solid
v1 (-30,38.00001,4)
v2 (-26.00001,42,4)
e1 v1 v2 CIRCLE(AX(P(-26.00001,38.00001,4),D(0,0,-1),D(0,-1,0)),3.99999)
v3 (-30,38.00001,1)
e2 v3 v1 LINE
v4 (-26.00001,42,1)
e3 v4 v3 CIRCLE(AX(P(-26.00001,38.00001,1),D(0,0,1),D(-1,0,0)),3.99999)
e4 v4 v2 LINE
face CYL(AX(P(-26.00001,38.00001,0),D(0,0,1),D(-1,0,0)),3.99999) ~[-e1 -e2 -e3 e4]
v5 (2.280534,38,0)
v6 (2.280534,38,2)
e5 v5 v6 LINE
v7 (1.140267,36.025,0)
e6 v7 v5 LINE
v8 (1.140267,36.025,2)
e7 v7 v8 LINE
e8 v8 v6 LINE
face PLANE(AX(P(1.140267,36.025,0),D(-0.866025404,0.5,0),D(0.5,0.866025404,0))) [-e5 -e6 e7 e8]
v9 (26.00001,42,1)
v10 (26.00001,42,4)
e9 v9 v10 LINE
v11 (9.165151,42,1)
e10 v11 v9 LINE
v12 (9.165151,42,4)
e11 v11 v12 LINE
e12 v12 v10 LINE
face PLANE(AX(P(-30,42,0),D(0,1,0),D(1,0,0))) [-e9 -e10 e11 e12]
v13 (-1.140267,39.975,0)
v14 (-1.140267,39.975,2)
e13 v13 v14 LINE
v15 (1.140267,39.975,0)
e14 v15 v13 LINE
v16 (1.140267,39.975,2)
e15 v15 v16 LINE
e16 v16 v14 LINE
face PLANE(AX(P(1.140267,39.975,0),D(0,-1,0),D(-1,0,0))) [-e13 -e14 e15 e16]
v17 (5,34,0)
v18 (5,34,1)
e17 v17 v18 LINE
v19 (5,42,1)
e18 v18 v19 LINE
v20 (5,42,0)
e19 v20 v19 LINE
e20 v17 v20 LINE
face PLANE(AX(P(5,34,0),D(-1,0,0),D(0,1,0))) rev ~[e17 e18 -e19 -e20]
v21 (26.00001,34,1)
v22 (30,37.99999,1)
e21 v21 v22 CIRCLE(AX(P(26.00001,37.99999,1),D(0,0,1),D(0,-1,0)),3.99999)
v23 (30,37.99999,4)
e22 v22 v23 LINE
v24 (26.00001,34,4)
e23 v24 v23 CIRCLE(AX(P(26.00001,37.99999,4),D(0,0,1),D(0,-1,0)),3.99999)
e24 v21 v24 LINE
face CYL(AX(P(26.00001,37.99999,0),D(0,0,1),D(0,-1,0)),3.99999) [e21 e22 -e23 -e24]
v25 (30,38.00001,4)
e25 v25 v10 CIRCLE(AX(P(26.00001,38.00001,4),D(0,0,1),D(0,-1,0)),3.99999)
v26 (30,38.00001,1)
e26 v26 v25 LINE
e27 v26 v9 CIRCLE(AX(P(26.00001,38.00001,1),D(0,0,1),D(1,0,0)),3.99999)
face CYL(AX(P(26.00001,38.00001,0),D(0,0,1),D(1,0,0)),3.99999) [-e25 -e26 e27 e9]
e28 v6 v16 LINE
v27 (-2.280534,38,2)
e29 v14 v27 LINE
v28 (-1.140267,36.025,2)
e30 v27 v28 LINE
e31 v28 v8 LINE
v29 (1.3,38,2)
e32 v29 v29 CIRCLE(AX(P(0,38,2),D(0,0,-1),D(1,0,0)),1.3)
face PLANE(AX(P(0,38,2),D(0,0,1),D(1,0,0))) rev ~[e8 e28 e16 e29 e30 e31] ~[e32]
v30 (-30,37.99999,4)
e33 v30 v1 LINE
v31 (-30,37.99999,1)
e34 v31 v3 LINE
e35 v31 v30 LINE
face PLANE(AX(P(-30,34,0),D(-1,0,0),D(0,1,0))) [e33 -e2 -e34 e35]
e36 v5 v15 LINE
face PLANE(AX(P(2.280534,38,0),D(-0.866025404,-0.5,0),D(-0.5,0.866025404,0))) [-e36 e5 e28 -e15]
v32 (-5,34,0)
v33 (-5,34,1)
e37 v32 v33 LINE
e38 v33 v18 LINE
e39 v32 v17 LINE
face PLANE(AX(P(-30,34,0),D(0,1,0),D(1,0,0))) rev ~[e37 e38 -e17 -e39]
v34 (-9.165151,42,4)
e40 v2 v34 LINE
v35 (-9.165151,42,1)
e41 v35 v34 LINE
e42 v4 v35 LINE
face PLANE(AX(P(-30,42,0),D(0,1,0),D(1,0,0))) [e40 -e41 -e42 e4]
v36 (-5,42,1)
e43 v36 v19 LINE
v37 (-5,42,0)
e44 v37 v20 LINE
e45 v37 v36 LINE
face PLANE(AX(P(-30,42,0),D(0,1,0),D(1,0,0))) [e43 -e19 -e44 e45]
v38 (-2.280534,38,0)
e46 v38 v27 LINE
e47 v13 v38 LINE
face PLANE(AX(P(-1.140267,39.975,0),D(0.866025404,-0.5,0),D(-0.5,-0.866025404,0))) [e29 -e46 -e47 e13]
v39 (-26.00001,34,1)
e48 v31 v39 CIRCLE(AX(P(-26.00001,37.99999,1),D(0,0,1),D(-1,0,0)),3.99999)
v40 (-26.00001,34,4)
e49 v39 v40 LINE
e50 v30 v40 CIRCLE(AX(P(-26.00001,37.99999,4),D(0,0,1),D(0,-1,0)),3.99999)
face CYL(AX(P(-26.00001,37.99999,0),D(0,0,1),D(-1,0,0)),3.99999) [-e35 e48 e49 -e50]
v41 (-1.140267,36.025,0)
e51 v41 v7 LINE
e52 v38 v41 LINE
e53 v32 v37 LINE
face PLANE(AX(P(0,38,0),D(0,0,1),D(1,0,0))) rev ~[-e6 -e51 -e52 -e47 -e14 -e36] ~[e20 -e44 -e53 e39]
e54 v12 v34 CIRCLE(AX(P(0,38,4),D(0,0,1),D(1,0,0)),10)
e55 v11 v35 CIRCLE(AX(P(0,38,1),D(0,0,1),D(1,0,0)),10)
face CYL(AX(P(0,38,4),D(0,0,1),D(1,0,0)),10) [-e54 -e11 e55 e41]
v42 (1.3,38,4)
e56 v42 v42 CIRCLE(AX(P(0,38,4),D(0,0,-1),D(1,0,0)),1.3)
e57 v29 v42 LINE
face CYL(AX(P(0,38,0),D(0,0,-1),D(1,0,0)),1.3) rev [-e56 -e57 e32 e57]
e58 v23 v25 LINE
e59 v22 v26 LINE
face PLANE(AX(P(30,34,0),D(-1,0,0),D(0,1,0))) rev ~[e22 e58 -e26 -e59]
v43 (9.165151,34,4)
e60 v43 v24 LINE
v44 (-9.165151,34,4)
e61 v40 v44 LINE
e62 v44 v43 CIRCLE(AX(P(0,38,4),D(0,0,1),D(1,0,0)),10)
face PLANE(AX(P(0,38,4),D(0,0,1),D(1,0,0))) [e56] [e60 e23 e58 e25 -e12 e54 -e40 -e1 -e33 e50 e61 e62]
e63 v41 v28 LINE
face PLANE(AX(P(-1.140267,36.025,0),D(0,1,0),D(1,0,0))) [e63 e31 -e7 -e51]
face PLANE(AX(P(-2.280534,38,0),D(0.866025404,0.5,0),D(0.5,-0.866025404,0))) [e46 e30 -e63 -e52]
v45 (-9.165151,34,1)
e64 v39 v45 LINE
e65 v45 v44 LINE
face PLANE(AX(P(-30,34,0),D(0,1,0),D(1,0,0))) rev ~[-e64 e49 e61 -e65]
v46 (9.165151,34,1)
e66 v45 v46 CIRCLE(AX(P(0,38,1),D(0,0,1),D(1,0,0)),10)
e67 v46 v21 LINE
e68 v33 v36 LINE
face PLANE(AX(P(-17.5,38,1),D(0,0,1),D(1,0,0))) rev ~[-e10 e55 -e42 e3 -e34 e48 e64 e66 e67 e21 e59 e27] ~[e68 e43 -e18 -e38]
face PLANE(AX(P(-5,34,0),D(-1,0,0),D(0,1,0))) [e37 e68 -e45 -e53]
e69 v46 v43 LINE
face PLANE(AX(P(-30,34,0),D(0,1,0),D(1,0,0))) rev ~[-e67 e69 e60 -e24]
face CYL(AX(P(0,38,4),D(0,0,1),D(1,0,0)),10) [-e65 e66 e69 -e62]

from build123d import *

# Parameters (mm, degrees)
F2_W      = 60
F2_H      = 8
F2_R      = 3
F4_DEPTH  = 4
F5_R      = 3.99999
F6_R      = 10
F7_DEPTH  = 3
F3_R      = 1.3
F8_DEPTH  = 4.001
F9_W      = 25
F9_H      = 8
F10_DEPTH = 1
F11_DEPTH = 2


# Not quite as in the source:
# - a fillet or chamfer is up to 0.001 mm smaller than in the source, because OpenCascade refuses the exact size


with BuildPart() as f4:
    # F2 (on face) → F4 (new body)
    with BuildSketch(Plane.XY):
        with Locations((0, 38)):
            Rectangle(F2_W, F2_H)
        with Locations((-26, 38)):
            Circle(F2_R, mode=Mode.SUBTRACT)
        Polygon((1.1402667816, 36.025), (0, 36.025), (-1.1402667816, 36.025), (-2.2805335633, 38), (-1.1402667816, 39.975), (0, 39.975), (1.1402667816, 39.975), (2.2805335633, 38), align=None, mode=Mode.SUBTRACT)
        with Locations((26, 38)):
            Circle(F2_R, mode=Mode.SUBTRACT)
        Polygon((-1.1402667816, 36.025), (0, 36.025), (1.1402667816, 36.025), (2.2805335633, 38), (1.1402667816, 39.975), (0, 39.975), (-1.1402667816, 39.975), (-2.2805335633, 38), align=None)
        with Locations((-26, 38)):
            Circle(F2_R)
        with Locations((26, 38)):
            Circle(F2_R)
    extrude(amount=F4_DEPTH)

    # F5 (radius 4 in the source; OpenCascade refuses exactly that, so slightly less here)
    f5_edges = [f4.edges().sort_by_distance(p)[0] for p in [
        (-30, 42, 2),
        (-30, 34, 2),
        (30, 42, 2),
        (30, 34, 2),
    ]]
    fillet(f5_edges, radius=F5_R)

    # F6 (on face) → F7 (join)
    with BuildSketch(Plane.XY.offset(4)):
        with Locations((0, 38)):
            Circle(F6_R)
    extrude(amount=-F7_DEPTH)

    # F3 (on face) → F8 (cut, through all)
    with BuildSketch(Plane.XY):
        with Locations((0, 38)):
            Circle(F3_R)
    extrude(amount=F8_DEPTH, mode=Mode.SUBTRACT)

    # F9 (on face) → F10 (cut)
    with BuildSketch(Plane.XY):
        with Locations((17.5, 38)):
            Rectangle(F9_W, F9_H)
        with Locations((-17.5, 38)):
            Rectangle(F9_W, F9_H)
    extrude(amount=F10_DEPTH, mode=Mode.SUBTRACT)

    # F2 (on face) → F11 (cut)
    with BuildSketch(Plane.XY):
        Polygon((-1.1402667816, 36.025), (0, 36.025), (1.1402667816, 36.025), (2.2805335633, 38), (1.1402667816, 39.975), (0, 39.975), (-1.1402667816, 39.975), (-2.2805335633, 38), align=None)
    extrude(amount=F11_DEPTH, mode=Mode.SUBTRACT)


solid = f4.part
